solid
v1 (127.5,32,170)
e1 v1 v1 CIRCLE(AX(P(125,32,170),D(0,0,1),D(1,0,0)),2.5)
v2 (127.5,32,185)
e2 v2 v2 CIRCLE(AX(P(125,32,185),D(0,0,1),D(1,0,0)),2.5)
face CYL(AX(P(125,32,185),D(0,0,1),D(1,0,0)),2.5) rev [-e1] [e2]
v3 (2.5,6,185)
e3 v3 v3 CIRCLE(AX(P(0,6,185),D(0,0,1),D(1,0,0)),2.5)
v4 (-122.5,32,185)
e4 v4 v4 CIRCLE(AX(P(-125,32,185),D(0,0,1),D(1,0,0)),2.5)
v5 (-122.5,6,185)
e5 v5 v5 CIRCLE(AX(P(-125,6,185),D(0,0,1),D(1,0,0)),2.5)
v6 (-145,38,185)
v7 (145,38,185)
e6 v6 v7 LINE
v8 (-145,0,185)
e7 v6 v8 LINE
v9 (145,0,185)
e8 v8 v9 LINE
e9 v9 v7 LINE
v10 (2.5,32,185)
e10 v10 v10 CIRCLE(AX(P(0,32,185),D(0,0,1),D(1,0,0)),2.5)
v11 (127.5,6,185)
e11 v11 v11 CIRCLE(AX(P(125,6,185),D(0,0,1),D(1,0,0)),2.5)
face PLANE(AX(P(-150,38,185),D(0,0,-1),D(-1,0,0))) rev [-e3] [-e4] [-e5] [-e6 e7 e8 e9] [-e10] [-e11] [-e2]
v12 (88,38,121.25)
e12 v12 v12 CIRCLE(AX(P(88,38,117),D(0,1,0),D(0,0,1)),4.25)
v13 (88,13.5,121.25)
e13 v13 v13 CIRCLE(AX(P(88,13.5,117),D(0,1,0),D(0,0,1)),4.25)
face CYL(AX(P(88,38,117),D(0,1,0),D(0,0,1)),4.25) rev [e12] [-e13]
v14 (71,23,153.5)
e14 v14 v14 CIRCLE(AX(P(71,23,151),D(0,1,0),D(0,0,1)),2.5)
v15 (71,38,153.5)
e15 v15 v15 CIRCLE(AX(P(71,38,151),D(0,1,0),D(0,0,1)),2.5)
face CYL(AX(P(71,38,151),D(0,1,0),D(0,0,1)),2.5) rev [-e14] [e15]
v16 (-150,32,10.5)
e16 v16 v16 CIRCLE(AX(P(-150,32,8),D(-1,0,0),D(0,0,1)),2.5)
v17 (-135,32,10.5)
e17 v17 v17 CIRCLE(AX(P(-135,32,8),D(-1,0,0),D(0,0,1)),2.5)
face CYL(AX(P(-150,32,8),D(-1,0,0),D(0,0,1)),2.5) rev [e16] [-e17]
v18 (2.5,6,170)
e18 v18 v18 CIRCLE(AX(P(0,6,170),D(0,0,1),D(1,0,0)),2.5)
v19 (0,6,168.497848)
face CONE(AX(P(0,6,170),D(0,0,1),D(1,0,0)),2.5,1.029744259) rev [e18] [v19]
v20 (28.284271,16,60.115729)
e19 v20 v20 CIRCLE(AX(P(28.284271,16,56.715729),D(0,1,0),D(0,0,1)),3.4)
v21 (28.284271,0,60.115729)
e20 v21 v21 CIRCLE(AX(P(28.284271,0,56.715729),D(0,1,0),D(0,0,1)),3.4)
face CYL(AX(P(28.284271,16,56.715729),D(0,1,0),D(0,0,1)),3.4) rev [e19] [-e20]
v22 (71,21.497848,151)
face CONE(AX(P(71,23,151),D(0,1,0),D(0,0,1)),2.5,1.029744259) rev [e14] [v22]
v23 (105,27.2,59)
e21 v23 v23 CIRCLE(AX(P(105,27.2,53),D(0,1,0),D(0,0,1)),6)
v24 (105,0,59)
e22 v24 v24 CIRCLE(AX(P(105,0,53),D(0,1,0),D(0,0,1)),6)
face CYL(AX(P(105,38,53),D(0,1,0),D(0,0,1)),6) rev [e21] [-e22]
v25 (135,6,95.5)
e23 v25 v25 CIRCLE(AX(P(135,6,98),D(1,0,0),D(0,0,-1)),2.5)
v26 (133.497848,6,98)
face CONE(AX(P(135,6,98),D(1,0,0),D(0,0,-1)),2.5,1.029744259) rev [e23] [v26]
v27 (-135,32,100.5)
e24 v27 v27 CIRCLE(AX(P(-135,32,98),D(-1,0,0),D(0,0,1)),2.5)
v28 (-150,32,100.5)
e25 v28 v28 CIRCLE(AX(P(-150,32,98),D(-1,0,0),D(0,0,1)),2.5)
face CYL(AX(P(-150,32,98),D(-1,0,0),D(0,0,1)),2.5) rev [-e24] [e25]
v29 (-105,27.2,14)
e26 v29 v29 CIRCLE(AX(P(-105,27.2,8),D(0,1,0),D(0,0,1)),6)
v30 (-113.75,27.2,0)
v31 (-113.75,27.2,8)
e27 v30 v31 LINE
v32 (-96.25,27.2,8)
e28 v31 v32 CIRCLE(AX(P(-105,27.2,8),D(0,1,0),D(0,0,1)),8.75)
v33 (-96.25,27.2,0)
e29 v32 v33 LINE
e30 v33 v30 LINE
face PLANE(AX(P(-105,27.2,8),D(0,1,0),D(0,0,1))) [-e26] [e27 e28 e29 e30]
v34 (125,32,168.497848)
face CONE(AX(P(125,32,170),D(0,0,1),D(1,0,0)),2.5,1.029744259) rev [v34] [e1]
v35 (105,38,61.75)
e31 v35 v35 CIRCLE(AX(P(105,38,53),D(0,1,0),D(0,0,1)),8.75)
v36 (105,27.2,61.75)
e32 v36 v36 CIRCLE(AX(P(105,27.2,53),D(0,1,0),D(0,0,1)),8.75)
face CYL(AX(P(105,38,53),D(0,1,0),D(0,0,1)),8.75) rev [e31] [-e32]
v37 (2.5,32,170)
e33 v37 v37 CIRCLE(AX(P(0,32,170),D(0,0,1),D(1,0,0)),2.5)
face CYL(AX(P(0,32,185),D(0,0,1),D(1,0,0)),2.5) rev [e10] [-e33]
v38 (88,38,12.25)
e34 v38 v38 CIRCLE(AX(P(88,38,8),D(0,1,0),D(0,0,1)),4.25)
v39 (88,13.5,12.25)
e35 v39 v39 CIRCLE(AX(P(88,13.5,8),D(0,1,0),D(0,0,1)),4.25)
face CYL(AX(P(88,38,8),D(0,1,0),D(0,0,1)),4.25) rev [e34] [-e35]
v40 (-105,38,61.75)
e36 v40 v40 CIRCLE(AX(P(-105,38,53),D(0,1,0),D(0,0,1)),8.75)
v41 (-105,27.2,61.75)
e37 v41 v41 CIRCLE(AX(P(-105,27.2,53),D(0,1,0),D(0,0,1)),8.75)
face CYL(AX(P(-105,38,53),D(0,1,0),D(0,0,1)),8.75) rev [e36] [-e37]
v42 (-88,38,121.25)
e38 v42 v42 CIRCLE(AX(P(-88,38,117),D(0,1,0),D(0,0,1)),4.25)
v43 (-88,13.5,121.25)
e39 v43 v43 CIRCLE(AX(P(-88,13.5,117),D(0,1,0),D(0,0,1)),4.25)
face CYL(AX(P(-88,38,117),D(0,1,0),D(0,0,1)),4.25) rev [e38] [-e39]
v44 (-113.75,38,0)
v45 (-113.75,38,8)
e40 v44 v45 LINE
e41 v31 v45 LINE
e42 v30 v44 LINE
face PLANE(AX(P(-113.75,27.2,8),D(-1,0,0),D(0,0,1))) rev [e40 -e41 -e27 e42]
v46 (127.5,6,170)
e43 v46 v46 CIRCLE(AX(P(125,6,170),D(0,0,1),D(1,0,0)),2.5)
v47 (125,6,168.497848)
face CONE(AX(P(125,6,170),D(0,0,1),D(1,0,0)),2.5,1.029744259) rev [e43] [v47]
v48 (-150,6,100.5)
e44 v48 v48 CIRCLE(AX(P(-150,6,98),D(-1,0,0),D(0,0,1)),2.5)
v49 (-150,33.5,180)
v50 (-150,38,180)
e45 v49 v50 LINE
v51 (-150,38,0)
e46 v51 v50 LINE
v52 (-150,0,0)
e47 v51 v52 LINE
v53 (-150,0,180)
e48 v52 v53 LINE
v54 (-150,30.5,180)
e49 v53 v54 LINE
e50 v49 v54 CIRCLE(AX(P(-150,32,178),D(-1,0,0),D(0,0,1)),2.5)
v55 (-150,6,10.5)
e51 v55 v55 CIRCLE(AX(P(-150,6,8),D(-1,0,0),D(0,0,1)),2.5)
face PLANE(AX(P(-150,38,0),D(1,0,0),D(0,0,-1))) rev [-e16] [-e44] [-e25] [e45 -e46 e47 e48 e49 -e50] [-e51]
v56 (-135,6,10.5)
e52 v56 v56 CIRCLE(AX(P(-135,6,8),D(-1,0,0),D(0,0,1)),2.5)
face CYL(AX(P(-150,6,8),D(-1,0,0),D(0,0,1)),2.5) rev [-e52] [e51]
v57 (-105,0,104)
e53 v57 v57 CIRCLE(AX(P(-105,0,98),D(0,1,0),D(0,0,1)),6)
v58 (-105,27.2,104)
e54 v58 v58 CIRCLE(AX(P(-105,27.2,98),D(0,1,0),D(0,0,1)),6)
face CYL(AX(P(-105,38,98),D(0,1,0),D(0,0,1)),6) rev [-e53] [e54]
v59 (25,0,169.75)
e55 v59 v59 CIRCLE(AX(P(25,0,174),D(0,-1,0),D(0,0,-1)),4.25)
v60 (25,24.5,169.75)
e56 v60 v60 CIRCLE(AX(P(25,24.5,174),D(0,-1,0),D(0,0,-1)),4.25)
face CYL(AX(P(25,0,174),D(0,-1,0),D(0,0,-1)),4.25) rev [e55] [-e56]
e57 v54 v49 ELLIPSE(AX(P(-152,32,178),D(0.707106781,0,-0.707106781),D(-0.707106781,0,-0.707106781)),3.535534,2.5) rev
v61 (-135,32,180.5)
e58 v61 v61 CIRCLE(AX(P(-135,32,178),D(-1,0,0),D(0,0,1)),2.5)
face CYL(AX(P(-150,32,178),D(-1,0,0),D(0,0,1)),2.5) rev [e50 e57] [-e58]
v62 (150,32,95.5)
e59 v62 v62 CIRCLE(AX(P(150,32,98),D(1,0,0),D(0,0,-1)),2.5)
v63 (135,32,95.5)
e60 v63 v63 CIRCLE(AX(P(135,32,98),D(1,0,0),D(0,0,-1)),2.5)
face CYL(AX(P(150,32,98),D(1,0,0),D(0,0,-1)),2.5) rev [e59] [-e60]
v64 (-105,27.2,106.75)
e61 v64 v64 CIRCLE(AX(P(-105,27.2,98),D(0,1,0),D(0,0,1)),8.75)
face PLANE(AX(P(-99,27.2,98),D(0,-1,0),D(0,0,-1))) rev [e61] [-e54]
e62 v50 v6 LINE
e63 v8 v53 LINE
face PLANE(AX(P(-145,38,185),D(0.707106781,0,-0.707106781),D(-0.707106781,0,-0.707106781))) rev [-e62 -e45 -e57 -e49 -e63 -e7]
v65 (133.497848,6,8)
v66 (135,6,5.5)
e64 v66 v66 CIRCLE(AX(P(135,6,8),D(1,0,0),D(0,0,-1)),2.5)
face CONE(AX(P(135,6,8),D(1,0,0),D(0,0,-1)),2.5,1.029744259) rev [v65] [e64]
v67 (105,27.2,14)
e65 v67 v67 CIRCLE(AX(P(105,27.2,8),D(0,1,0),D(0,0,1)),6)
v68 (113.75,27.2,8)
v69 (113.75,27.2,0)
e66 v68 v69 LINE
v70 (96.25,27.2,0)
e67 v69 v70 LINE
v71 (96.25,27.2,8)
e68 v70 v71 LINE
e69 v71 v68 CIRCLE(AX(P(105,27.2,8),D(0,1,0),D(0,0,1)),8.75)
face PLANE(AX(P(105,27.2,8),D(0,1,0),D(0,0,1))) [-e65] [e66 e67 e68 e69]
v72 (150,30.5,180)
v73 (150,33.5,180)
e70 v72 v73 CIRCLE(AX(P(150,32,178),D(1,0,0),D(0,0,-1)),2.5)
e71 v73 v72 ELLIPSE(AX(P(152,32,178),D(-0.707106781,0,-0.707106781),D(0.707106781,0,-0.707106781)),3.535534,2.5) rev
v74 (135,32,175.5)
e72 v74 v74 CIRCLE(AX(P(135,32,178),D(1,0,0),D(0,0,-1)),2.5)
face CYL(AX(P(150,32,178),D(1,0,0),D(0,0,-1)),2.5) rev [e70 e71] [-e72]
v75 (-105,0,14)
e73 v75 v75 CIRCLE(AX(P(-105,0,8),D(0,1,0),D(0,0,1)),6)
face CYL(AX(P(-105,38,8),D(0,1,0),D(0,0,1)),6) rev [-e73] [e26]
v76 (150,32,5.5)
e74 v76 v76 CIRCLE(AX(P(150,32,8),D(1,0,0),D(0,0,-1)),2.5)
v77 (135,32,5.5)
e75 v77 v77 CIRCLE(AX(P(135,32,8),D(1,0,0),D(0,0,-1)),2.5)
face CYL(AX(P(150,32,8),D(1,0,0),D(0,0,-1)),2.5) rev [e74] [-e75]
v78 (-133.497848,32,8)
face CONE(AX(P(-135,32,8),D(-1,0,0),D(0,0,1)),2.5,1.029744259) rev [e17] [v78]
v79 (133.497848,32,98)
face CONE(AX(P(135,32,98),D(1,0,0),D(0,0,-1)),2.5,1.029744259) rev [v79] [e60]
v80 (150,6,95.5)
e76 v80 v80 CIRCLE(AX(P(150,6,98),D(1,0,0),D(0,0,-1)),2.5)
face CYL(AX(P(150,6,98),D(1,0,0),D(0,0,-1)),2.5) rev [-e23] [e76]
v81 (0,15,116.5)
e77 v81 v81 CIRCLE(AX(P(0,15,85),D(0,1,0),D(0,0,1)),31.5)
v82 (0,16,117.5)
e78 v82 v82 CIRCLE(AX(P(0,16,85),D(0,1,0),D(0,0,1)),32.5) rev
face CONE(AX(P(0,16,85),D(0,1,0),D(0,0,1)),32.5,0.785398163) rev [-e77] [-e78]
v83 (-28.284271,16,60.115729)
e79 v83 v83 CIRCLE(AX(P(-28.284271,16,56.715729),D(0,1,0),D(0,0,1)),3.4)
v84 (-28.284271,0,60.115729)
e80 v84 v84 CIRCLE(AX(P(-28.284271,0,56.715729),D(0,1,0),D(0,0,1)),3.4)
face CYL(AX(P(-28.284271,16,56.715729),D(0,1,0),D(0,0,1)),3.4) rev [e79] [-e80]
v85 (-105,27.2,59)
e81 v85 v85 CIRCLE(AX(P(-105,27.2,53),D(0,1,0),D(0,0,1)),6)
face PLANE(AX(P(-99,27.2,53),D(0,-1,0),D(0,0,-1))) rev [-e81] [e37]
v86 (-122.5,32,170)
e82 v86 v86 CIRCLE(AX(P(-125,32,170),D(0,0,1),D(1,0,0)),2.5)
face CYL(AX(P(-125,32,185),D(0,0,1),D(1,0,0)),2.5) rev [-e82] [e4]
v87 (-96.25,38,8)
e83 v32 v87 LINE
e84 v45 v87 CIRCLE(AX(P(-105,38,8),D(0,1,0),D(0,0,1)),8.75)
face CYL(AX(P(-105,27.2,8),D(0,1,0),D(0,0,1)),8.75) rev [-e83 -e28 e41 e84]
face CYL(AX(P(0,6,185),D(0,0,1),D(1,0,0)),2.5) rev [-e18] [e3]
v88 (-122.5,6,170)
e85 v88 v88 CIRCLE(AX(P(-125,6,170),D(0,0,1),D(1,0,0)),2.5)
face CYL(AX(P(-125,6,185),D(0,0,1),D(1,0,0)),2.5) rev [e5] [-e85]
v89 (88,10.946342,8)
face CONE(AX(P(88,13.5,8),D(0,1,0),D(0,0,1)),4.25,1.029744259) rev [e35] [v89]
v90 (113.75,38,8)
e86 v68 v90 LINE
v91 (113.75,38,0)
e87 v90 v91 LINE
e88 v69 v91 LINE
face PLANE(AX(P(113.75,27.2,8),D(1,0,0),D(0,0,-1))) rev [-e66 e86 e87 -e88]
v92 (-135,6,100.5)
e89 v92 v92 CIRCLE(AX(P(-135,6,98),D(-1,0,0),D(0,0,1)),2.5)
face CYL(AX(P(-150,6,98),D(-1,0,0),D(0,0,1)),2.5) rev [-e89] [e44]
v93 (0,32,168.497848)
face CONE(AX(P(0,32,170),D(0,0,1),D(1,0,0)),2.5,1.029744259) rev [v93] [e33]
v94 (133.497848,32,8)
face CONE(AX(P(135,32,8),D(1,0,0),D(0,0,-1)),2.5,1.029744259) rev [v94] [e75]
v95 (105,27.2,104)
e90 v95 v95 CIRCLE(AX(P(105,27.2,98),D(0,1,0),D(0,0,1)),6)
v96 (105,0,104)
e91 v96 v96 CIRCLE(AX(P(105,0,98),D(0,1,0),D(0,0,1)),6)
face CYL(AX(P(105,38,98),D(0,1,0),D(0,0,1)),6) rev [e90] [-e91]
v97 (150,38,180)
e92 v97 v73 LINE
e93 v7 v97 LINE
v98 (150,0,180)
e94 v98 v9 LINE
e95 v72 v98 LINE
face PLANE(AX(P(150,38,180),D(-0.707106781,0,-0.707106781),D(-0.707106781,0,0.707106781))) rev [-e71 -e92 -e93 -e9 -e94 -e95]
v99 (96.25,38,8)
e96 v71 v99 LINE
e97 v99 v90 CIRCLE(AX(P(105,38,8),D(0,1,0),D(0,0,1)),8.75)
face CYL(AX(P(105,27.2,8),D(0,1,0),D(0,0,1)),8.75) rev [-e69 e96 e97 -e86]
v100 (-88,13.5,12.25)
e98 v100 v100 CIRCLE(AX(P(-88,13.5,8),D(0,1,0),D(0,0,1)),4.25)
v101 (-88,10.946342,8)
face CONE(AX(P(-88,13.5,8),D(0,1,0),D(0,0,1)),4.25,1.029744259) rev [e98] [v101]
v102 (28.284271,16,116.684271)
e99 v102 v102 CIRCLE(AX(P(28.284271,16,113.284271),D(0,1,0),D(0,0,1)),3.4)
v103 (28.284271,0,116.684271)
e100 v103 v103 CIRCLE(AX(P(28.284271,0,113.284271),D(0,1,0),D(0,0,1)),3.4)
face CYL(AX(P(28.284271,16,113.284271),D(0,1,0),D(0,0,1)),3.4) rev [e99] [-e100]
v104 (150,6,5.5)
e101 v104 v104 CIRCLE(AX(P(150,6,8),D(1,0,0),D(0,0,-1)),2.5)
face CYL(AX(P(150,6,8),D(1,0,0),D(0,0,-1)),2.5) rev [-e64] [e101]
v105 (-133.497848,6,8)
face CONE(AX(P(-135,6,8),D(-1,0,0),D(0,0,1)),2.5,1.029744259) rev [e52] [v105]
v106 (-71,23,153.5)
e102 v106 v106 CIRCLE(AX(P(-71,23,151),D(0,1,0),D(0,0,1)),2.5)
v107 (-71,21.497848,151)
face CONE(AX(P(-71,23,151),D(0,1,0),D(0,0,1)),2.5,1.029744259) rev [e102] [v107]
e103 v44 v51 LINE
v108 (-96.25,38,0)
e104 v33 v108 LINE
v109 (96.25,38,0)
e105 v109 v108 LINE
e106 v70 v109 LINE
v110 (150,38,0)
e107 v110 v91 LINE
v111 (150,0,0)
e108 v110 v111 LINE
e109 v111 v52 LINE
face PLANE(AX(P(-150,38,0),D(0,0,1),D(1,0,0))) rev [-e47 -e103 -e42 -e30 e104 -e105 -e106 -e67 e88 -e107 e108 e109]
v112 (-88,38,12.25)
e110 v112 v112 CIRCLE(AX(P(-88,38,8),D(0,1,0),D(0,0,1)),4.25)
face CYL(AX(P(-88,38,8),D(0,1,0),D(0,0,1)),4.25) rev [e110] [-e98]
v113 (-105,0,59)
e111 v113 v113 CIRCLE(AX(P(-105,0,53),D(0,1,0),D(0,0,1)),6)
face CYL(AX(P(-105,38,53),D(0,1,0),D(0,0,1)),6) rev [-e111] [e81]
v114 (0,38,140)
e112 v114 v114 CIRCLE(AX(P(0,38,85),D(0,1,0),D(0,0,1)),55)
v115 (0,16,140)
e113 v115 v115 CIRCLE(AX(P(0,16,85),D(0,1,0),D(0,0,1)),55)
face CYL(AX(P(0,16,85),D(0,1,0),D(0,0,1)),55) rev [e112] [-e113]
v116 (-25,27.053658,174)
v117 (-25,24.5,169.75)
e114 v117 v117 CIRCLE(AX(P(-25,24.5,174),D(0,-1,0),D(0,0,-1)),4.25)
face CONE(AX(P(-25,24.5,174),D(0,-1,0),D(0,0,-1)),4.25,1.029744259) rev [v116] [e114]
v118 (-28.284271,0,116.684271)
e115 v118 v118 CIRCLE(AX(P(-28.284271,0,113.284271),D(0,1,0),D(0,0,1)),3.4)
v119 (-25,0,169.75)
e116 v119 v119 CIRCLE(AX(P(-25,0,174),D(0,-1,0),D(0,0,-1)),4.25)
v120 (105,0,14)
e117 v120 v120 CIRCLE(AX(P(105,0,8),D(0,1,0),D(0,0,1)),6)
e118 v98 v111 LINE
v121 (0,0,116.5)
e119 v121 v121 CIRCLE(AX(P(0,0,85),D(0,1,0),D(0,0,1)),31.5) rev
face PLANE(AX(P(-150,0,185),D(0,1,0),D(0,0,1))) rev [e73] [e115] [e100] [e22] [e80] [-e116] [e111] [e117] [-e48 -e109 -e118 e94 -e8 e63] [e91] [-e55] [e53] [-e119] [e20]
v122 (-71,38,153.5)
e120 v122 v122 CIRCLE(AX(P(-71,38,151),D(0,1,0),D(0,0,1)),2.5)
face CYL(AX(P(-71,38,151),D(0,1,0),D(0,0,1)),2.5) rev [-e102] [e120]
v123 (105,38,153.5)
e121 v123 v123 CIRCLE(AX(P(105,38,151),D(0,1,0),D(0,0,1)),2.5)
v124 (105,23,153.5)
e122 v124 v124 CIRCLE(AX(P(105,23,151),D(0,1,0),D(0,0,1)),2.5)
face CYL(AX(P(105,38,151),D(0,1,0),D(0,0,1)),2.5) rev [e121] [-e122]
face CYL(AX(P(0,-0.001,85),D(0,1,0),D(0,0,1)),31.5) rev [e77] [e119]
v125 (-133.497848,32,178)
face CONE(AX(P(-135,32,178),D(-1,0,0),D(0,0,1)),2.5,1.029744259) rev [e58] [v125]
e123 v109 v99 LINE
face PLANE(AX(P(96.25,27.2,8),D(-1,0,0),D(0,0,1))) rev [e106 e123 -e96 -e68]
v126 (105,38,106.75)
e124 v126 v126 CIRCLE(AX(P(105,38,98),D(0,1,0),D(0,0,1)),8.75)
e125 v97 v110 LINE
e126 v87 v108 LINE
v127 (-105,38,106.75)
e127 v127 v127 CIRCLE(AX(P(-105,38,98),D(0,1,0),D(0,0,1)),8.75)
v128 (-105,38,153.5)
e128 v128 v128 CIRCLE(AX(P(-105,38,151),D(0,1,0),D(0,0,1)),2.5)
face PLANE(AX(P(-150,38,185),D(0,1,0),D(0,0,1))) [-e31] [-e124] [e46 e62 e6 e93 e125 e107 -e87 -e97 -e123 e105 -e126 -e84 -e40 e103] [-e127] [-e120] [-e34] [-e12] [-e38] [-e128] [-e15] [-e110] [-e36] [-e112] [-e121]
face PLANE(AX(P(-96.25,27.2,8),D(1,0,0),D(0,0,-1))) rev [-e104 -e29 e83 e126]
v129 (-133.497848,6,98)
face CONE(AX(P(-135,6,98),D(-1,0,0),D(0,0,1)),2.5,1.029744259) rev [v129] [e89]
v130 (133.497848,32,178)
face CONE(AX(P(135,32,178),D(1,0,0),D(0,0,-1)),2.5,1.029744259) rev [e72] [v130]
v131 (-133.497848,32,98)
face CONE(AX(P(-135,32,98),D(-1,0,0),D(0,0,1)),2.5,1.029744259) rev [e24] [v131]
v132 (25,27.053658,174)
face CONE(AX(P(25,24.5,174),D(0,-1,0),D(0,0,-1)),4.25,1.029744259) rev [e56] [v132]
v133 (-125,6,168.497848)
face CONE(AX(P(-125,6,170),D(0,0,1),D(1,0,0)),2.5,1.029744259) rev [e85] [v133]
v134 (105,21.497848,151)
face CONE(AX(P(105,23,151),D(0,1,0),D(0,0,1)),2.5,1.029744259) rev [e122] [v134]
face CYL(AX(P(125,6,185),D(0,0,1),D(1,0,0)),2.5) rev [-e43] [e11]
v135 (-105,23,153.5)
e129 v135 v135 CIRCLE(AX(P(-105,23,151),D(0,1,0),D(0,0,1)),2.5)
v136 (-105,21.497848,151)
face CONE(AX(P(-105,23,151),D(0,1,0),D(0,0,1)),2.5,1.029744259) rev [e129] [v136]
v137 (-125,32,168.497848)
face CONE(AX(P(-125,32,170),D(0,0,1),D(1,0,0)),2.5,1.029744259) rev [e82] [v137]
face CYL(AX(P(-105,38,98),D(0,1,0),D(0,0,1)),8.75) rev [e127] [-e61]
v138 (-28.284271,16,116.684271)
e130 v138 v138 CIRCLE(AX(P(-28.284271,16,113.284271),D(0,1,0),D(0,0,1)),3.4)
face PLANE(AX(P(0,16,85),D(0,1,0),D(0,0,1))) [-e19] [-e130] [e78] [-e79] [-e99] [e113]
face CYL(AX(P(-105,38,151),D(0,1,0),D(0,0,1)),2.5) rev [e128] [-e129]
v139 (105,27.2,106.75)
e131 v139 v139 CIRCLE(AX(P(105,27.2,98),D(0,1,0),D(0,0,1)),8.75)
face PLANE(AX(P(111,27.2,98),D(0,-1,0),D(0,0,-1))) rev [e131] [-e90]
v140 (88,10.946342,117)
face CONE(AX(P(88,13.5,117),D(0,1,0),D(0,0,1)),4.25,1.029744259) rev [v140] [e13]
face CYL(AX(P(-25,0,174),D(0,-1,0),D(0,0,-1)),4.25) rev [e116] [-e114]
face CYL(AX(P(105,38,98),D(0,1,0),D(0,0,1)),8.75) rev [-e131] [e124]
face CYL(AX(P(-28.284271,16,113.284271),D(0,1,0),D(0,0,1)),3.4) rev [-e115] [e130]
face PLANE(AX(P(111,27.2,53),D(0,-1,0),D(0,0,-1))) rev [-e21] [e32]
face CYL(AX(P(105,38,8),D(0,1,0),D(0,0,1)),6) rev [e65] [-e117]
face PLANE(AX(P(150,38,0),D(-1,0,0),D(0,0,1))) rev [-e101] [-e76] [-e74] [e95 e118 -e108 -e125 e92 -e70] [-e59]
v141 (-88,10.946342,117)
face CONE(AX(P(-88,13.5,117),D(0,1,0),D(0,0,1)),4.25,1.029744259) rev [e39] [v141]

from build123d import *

# Parameters (mm, degrees)
SKETCH1_W                                        = 300
SKETCH1_H                                        = 185
BOSS_EXTRUDE1_DEPTH                              = 38
CUT_EXTRUDE1_REACH                               = 243.183
SKETCH2_R                                        = 31.5
SKETCH3_R                                        = 55
CUT_EXTRUDE2_DEPTH                               = 22
CUT_EXTRUDE3_DEPTH                               = 10.8
CBORE_FOR_M10_SOCKET_HEAD_CAP_SCREW1_D           = 12
CBORE_FOR_M10_SOCKET_HEAD_CAP_SCREW1_CBORE_D     = 17.5
CBORE_FOR_M10_SOCKET_HEAD_CAP_SCREW1_CBORE_DEPTH = 10.8
LPATTERN1_COUNT                                  = 3
LPATTERN1_PITCH                                  = 45
M10X1_5_TAPPED_HOLE1_D                           = 8.5
M10X1_5_TAPPED_HOLE1_DEPTH                       = 24.5
M10X1_5_TAPPED_HOLE1_TIP                         = 2.553657631
M10X1_5_TAPPED_HOLE2_D                           = 8.5
M10X1_5_TAPPED_HOLE2_DEPTH                       = 24.5
M10X1_5_TAPPED_HOLE2_TIP                         = 2.553657631
M8X1_25_TAPPED_HOLE1_D                           = 6.8
M6X1_0_TAPPED_HOLE1_D                            = 5
M6X1_0_TAPPED_HOLE1_DEPTH                        = 15
M6X1_0_TAPPED_HOLE1_TIP                          = 1.502151548
M6X1_0_TAPPED_HOLE2_AT_2_COUNT                   = 2
M6X1_0_TAPPED_HOLE2_AT_2_PITCH                   = 26
M6X1_0_TAPPED_HOLE2_AT_3_COUNT                   = 2
M6X1_0_TAPPED_HOLE2_AT_3_PITCH                   = 93.680307429
M6X1_0_TAPPED_HOLE2_AT_4_COUNT                   = 2
M6X1_0_TAPPED_HOLE2_AT_4_PITCH                   = 90
M6X1_0_TAPPED_HOLE3_AT_2_COUNT                   = 2
M6X1_0_TAPPED_HOLE3_AT_2_PITCH                   = 125
M6X1_0_TAPPED_HOLE3_AT_3_COUNT                   = 2
M6X1_0_TAPPED_HOLE3_AT_3_PITCH                   = 250
LPATTERN3_COUNT                                  = 2
LPATTERN3_PITCH                                  = 26
CHAMFER1_SIZE                                    = 5
CHAMFER2_SIZE                                    = 1


with BuildPart() as part:
    # Sketch1 → Boss-Extrude1 (new body)
    with BuildSketch(Plane(origin=(0, 0, 0), x_dir=(1, 0, 0), z_dir=(0, 1, 0))):
        with Locations((0, -92.5)):
            Rectangle(SKETCH1_W, SKETCH1_H)
    extrude(amount=BOSS_EXTRUDE1_DEPTH)

    # Sketch2 → Cut-Extrude1 (cut, up to next)
    with BuildSketch(Plane(origin=(0, 38, 0), x_dir=(1, 0, 0), z_dir=(0, 1, 0)), mode=Mode.PRIVATE) as cut_extrude1_sk1:
        with Locations(Location((0, -85, 0), (0, 0, 270))):
            Circle(SKETCH2_R)
    cut_extrude1_tool1 = extrude(cut_extrude1_sk1.sketch, amount=-CUT_EXTRUDE1_REACH, mode=Mode.PRIVATE) & part.part
    add(cut_extrude1_tool1.solids().sort_by_distance((0, 38, 85))[0], mode=Mode.SUBTRACT)

    # Sketch3 → Cut-Extrude2 (cut)
    with BuildSketch(Plane(origin=(0, 38, 0), x_dir=(1, 0, 0), z_dir=(0, 1, 0))):
        with Locations(Location((0, -85, 0), (0, 0, 270))):
            Circle(SKETCH3_R)
    extrude(amount=-CUT_EXTRUDE2_DEPTH, mode=Mode.SUBTRACT)

    # Sketch6 → Cut-Extrude3 (cut)
    with BuildSketch(Plane(origin=(0, 38, 0), x_dir=(1, 0, 0), z_dir=(0, 1, 0))):
        with BuildLine():
            Line((-113.75, -8), (-113.75, 0))
            Line((-113.75, 0), (-96.25, 0))
            Line((-96.25, 0), (-96.25, -8))
            ThreePointArc((-96.25, -8), (-105, -16.75), (-113.75, -8))
        make_face()
        with BuildLine():
            Line((96.25, -8), (96.25, 0))
            Line((96.25, 0), (113.75, 0))
            Line((113.75, 0), (113.75, -8))
            ThreePointArc((113.75, -8), (105, -16.75), (96.25, -8))
        make_face()
    extrude(amount=-CUT_EXTRUDE3_DEPTH, mode=Mode.SUBTRACT)

    # CBORE for M10 Socket Head Cap Screw1 (through all)
    with Locations(Plane(origin=(0, 38, 0), x_dir=(-1, 0, 0), z_dir=(0, 1, 0))):
        with Locations((105, 8), (-105, 8)):
            cbore_for_m10_socket_head_cap_screw1 = CounterBoreHole(CBORE_FOR_M10_SOCKET_HEAD_CAP_SCREW1_D / 2, CBORE_FOR_M10_SOCKET_HEAD_CAP_SCREW1_CBORE_D / 2, CBORE_FOR_M10_SOCKET_HEAD_CAP_SCREW1_CBORE_DEPTH)

    # LPattern1: CBORE for M10 Socket Head Cap Screw1 ×3
    with Locations(*[(0, 0, i * LPATTERN1_PITCH) for i in range(1, LPATTERN1_COUNT)]):
        add(cbore_for_m10_socket_head_cap_screw1, mode=Mode.SUBTRACT)

    # M10x1.5 Tapped Hole1
    with Locations(Plane(origin=(0, 38, 0), x_dir=(-1, 0, 0), z_dir=(0, 1, 0))):
        with Locations((88, 8), (-88, 8), (-88, 117), (88, 117)):
            Hole(M10X1_5_TAPPED_HOLE1_D / 2, depth=M10X1_5_TAPPED_HOLE1_DEPTH)
            with Locations((0, 0, -(M10X1_5_TAPPED_HOLE1_DEPTH + M10X1_5_TAPPED_HOLE1_TIP / 2))):  # 118° drill point
                Cone(0, M10X1_5_TAPPED_HOLE1_D / 2, M10X1_5_TAPPED_HOLE1_TIP, mode=Mode.SUBTRACT)

    # M10x1.5 Tapped Hole2
    with Locations(Plane.XZ):
        with Locations((25, 174), (-25, 174)):
            Hole(M10X1_5_TAPPED_HOLE2_D / 2, depth=M10X1_5_TAPPED_HOLE2_DEPTH)
            with Locations((0, 0, -(M10X1_5_TAPPED_HOLE2_DEPTH + M10X1_5_TAPPED_HOLE2_TIP / 2))):  # 118° drill point
                Cone(0, M10X1_5_TAPPED_HOLE2_D / 2, M10X1_5_TAPPED_HOLE2_TIP, mode=Mode.SUBTRACT)

    # M8x1.25 Tapped Hole1 (through all)
    with Locations(Plane(origin=(0, 16, 0), x_dir=(-1, 0, 0), z_dir=(0, 1, 0))):
        with Locations((28.284271247, 113.284271247), (-28.284271247, 113.284271247), (-28.284271247, 56.715728753), (28.284271247, 56.715728753)):
            Hole(M8X1_25_TAPPED_HOLE1_D / 2)

    # M6x1.0 Tapped Hole1
    with Locations(Plane(origin=(0, 38, 0), x_dir=(-1, 0, 0), z_dir=(0, 1, 0))):
        with Locations((-71, 151), (71, 151), (-105, 151), (105, 151)):
            Hole(M6X1_0_TAPPED_HOLE1_D / 2, depth=M6X1_0_TAPPED_HOLE1_DEPTH)
            with Locations((0, 0, -(M6X1_0_TAPPED_HOLE1_DEPTH + M6X1_0_TAPPED_HOLE1_TIP / 2))):  # 118° drill point
                Cone(0, M6X1_0_TAPPED_HOLE1_D / 2, M6X1_0_TAPPED_HOLE1_TIP, mode=Mode.SUBTRACT)

    # Sketch15 → M6x1.0 Tapped Hole2 (revolve, cut)
    with BuildSketch(Plane(origin=(150, 6, 8), x_dir=(0, 0, -1), z_dir=(0, 1, 0))):
        Polygon((0, 0), (0, 16.502151548), (2.5, 15), (2.5, 0), align=None)
    m6x1_0_tapped_hole2 = revolve(axis=Axis((156.35, 6, 8), (-1, 0, 0)), mode=Mode.SUBTRACT)

    # M6x1.0 Tapped Hole2 at 2: M6x1.0 Tapped Hole2 ×2
    with Locations(*[(0, i * M6X1_0_TAPPED_HOLE2_AT_2_PITCH, 0) for i in range(1, M6X1_0_TAPPED_HOLE2_AT_2_COUNT)]):
        add(m6x1_0_tapped_hole2, mode=Mode.SUBTRACT)

    # M6x1.0 Tapped Hole2 at 3: M6x1.0 Tapped Hole2 ×2
    with Locations(*[Vector(0, 0.27753965282077453, 0.9607141828411425) * (i * M6X1_0_TAPPED_HOLE2_AT_3_PITCH) for i in range(1, M6X1_0_TAPPED_HOLE2_AT_3_COUNT)]):
        add(m6x1_0_tapped_hole2, mode=Mode.SUBTRACT)

    # M6x1.0 Tapped Hole2 at 4: M6x1.0 Tapped Hole2 ×2
    with Locations(*[(0, 0, i * M6X1_0_TAPPED_HOLE2_AT_4_PITCH) for i in range(1, M6X1_0_TAPPED_HOLE2_AT_4_COUNT)]):
        add(m6x1_0_tapped_hole2, mode=Mode.SUBTRACT)

    # Sketch17 → M6x1.0 Tapped Hole4 (revolve, cut)
    with BuildSketch(Plane(origin=(150, 32, 178), x_dir=(0, 0, -1), z_dir=(0, 1, 0))):
        Polygon((0, 0), (0, 16.502151548), (2.5, 15), (2.5, 0), align=None)
    m6x1_0_tapped_hole4 = revolve(axis=Axis((156.35, 32, 178), (-1, 0, 0)), mode=Mode.SUBTRACT)

    # Mirror1: M6x1.0 Tapped Hole2, M6x1.0 Tapped Hole4 across plane
    add(m6x1_0_tapped_hole2.mirror(Plane(origin=(0, 0, 0), x_dir=(0, 0, 1), z_dir=(1, 0, 0))), mode=Mode.SUBTRACT)
    add(m6x1_0_tapped_hole4.mirror(Plane(origin=(0, 0, 0), x_dir=(0, 0, 1), z_dir=(1, 0, 0))), mode=Mode.SUBTRACT)

    # Mirror1 copy 1 sketch → Mirror1 copy 1 (revolve, cut)
    with BuildSketch(Plane(origin=(-150, 32, 8), x_dir=(0, 0, -1), z_dir=(0, 1, 0))):
        Polygon((0, 0), (0, -16.502151548), (2.5, -15), (2.5, 0), align=None)
    revolve(axis=Axis((-156.35, 32, 8), (-1, 0, 0)), mode=Mode.SUBTRACT)

    # Mirror1 copy 2 sketch → Mirror1 copy 2 (revolve, cut)
    with BuildSketch(Plane(origin=(-150, 32, 98), x_dir=(0, 0, -1), z_dir=(0, 1, 0))):
        Polygon((0, 0), (0, -16.502151548), (2.5, -15), (2.5, 0), align=None)
    revolve(axis=Axis((-156.35, 32, 98), (-1, 0, 0)), mode=Mode.SUBTRACT)

    # Mirror1 copy 3 sketch → Mirror1 copy 3 (revolve, cut)
    with BuildSketch(Plane(origin=(-150, 6, 98), x_dir=(0, 0, -1), z_dir=(0, 1, 0))):
        Polygon((0, 0), (0, -16.502151548), (2.5, -15), (2.5, 0), align=None)
    revolve(axis=Axis((-156.35, 6, 98), (-1, 0, 0)), mode=Mode.SUBTRACT)

    # Sketch19 → M6x1.0 Tapped Hole3 (revolve, cut)
    with BuildSketch(Plane(origin=(125, 6, 185), x_dir=(0, -1, 0), z_dir=(1, 0, 0))):
        Polygon((0, 0), (0, 16.502151548), (2.5, 15), (2.5, 0), align=None)
    m6x1_0_tapped_hole3 = revolve(axis=Axis((125, 6, 191.35), (0, 0, -1)), mode=Mode.SUBTRACT)

    # M6x1.0 Tapped Hole3 at 2: M6x1.0 Tapped Hole3 ×2
    with Locations(*[(-i * M6X1_0_TAPPED_HOLE3_AT_2_PITCH, 0, 0) for i in range(1, M6X1_0_TAPPED_HOLE3_AT_2_COUNT)]):
        add(m6x1_0_tapped_hole3, mode=Mode.SUBTRACT)

    # M6x1.0 Tapped Hole3 at 3: M6x1.0 Tapped Hole3 ×2
    with Locations(*[(-i * M6X1_0_TAPPED_HOLE3_AT_3_PITCH, 0, 0) for i in range(1, M6X1_0_TAPPED_HOLE3_AT_3_COUNT)]):
        add(m6x1_0_tapped_hole3, mode=Mode.SUBTRACT)

    # LPattern3: M6x1.0 Tapped Hole3 ×2
    with Locations(*[(0, i * LPATTERN3_PITCH, 0) for i in range(1, LPATTERN3_COUNT)]):
        add(m6x1_0_tapped_hole3, mode=Mode.SUBTRACT)

    # LPattern3 copy 1 sketch → LPattern3 copy 1 (revolve, cut)
    with BuildSketch(Plane(origin=(0, 32, 185), x_dir=(0, -1, 0), z_dir=(1, 0, 0))):
        Polygon((0, 0), (0, 16.502151548), (2.5, 15), (2.5, 0), align=None)
    revolve(axis=Axis((0, 32, 191.35), (0, 0, -1)), mode=Mode.SUBTRACT)

    # LPattern3 copy 2 sketch → LPattern3 copy 2 (revolve, cut)
    with BuildSketch(Plane(origin=(-125, 32, 185), x_dir=(0, -1, 0), z_dir=(1, 0, 0))):
        Polygon((0, 0), (0, 16.502151548), (2.5, 15), (2.5, 0), align=None)
    revolve(axis=Axis((-125, 32, 191.35), (0, 0, -1)), mode=Mode.SUBTRACT)

    # Chamfer1
    # the kernel refuses this chamfer: 5 mm, written as the material it takes off along each edge
    with BuildSketch(Plane(origin=(150, -12.85841494, 185), x_dir=(0.027495876610587663, 0, -0.9996219169112968), z_dir=(0, 1, 0))) as chamfer1_piece_1:
        Polygon((CHAMFER1_SIZE * 0.999621916911, CHAMFER1_SIZE * 0.0274958766106), (-CHAMFER1_SIZE * 0.0274958766106, CHAMFER1_SIZE * 0.999621916911), (0, 0), align=None)
    extrude(amount=63.71682988, mode=Mode.SUBTRACT)
    with BuildSketch(Plane(origin=(-150, -12.85841494, 185), x_dir=(-0.027495876610587663, 0, -0.9996219169112968), z_dir=(0, 1, 0))) as chamfer1_piece_2:
        Polygon((CHAMFER1_SIZE * 0.999621916911, -CHAMFER1_SIZE * 0.0274958766106), (-CHAMFER1_SIZE * 0.0274958766106, -CHAMFER1_SIZE * 0.999621916911), (0, 0), align=None)
    extrude(amount=63.71682988, mode=Mode.SUBTRACT)

    # Chamfer2
    chamfer2_edges = [part.edges().sort_by_distance(p)[0] for p in [
        (0, 16, 53.5),
    ]]
    chamfer(chamfer2_edges, length=CHAMFER2_SIZE)


solid = part.part
